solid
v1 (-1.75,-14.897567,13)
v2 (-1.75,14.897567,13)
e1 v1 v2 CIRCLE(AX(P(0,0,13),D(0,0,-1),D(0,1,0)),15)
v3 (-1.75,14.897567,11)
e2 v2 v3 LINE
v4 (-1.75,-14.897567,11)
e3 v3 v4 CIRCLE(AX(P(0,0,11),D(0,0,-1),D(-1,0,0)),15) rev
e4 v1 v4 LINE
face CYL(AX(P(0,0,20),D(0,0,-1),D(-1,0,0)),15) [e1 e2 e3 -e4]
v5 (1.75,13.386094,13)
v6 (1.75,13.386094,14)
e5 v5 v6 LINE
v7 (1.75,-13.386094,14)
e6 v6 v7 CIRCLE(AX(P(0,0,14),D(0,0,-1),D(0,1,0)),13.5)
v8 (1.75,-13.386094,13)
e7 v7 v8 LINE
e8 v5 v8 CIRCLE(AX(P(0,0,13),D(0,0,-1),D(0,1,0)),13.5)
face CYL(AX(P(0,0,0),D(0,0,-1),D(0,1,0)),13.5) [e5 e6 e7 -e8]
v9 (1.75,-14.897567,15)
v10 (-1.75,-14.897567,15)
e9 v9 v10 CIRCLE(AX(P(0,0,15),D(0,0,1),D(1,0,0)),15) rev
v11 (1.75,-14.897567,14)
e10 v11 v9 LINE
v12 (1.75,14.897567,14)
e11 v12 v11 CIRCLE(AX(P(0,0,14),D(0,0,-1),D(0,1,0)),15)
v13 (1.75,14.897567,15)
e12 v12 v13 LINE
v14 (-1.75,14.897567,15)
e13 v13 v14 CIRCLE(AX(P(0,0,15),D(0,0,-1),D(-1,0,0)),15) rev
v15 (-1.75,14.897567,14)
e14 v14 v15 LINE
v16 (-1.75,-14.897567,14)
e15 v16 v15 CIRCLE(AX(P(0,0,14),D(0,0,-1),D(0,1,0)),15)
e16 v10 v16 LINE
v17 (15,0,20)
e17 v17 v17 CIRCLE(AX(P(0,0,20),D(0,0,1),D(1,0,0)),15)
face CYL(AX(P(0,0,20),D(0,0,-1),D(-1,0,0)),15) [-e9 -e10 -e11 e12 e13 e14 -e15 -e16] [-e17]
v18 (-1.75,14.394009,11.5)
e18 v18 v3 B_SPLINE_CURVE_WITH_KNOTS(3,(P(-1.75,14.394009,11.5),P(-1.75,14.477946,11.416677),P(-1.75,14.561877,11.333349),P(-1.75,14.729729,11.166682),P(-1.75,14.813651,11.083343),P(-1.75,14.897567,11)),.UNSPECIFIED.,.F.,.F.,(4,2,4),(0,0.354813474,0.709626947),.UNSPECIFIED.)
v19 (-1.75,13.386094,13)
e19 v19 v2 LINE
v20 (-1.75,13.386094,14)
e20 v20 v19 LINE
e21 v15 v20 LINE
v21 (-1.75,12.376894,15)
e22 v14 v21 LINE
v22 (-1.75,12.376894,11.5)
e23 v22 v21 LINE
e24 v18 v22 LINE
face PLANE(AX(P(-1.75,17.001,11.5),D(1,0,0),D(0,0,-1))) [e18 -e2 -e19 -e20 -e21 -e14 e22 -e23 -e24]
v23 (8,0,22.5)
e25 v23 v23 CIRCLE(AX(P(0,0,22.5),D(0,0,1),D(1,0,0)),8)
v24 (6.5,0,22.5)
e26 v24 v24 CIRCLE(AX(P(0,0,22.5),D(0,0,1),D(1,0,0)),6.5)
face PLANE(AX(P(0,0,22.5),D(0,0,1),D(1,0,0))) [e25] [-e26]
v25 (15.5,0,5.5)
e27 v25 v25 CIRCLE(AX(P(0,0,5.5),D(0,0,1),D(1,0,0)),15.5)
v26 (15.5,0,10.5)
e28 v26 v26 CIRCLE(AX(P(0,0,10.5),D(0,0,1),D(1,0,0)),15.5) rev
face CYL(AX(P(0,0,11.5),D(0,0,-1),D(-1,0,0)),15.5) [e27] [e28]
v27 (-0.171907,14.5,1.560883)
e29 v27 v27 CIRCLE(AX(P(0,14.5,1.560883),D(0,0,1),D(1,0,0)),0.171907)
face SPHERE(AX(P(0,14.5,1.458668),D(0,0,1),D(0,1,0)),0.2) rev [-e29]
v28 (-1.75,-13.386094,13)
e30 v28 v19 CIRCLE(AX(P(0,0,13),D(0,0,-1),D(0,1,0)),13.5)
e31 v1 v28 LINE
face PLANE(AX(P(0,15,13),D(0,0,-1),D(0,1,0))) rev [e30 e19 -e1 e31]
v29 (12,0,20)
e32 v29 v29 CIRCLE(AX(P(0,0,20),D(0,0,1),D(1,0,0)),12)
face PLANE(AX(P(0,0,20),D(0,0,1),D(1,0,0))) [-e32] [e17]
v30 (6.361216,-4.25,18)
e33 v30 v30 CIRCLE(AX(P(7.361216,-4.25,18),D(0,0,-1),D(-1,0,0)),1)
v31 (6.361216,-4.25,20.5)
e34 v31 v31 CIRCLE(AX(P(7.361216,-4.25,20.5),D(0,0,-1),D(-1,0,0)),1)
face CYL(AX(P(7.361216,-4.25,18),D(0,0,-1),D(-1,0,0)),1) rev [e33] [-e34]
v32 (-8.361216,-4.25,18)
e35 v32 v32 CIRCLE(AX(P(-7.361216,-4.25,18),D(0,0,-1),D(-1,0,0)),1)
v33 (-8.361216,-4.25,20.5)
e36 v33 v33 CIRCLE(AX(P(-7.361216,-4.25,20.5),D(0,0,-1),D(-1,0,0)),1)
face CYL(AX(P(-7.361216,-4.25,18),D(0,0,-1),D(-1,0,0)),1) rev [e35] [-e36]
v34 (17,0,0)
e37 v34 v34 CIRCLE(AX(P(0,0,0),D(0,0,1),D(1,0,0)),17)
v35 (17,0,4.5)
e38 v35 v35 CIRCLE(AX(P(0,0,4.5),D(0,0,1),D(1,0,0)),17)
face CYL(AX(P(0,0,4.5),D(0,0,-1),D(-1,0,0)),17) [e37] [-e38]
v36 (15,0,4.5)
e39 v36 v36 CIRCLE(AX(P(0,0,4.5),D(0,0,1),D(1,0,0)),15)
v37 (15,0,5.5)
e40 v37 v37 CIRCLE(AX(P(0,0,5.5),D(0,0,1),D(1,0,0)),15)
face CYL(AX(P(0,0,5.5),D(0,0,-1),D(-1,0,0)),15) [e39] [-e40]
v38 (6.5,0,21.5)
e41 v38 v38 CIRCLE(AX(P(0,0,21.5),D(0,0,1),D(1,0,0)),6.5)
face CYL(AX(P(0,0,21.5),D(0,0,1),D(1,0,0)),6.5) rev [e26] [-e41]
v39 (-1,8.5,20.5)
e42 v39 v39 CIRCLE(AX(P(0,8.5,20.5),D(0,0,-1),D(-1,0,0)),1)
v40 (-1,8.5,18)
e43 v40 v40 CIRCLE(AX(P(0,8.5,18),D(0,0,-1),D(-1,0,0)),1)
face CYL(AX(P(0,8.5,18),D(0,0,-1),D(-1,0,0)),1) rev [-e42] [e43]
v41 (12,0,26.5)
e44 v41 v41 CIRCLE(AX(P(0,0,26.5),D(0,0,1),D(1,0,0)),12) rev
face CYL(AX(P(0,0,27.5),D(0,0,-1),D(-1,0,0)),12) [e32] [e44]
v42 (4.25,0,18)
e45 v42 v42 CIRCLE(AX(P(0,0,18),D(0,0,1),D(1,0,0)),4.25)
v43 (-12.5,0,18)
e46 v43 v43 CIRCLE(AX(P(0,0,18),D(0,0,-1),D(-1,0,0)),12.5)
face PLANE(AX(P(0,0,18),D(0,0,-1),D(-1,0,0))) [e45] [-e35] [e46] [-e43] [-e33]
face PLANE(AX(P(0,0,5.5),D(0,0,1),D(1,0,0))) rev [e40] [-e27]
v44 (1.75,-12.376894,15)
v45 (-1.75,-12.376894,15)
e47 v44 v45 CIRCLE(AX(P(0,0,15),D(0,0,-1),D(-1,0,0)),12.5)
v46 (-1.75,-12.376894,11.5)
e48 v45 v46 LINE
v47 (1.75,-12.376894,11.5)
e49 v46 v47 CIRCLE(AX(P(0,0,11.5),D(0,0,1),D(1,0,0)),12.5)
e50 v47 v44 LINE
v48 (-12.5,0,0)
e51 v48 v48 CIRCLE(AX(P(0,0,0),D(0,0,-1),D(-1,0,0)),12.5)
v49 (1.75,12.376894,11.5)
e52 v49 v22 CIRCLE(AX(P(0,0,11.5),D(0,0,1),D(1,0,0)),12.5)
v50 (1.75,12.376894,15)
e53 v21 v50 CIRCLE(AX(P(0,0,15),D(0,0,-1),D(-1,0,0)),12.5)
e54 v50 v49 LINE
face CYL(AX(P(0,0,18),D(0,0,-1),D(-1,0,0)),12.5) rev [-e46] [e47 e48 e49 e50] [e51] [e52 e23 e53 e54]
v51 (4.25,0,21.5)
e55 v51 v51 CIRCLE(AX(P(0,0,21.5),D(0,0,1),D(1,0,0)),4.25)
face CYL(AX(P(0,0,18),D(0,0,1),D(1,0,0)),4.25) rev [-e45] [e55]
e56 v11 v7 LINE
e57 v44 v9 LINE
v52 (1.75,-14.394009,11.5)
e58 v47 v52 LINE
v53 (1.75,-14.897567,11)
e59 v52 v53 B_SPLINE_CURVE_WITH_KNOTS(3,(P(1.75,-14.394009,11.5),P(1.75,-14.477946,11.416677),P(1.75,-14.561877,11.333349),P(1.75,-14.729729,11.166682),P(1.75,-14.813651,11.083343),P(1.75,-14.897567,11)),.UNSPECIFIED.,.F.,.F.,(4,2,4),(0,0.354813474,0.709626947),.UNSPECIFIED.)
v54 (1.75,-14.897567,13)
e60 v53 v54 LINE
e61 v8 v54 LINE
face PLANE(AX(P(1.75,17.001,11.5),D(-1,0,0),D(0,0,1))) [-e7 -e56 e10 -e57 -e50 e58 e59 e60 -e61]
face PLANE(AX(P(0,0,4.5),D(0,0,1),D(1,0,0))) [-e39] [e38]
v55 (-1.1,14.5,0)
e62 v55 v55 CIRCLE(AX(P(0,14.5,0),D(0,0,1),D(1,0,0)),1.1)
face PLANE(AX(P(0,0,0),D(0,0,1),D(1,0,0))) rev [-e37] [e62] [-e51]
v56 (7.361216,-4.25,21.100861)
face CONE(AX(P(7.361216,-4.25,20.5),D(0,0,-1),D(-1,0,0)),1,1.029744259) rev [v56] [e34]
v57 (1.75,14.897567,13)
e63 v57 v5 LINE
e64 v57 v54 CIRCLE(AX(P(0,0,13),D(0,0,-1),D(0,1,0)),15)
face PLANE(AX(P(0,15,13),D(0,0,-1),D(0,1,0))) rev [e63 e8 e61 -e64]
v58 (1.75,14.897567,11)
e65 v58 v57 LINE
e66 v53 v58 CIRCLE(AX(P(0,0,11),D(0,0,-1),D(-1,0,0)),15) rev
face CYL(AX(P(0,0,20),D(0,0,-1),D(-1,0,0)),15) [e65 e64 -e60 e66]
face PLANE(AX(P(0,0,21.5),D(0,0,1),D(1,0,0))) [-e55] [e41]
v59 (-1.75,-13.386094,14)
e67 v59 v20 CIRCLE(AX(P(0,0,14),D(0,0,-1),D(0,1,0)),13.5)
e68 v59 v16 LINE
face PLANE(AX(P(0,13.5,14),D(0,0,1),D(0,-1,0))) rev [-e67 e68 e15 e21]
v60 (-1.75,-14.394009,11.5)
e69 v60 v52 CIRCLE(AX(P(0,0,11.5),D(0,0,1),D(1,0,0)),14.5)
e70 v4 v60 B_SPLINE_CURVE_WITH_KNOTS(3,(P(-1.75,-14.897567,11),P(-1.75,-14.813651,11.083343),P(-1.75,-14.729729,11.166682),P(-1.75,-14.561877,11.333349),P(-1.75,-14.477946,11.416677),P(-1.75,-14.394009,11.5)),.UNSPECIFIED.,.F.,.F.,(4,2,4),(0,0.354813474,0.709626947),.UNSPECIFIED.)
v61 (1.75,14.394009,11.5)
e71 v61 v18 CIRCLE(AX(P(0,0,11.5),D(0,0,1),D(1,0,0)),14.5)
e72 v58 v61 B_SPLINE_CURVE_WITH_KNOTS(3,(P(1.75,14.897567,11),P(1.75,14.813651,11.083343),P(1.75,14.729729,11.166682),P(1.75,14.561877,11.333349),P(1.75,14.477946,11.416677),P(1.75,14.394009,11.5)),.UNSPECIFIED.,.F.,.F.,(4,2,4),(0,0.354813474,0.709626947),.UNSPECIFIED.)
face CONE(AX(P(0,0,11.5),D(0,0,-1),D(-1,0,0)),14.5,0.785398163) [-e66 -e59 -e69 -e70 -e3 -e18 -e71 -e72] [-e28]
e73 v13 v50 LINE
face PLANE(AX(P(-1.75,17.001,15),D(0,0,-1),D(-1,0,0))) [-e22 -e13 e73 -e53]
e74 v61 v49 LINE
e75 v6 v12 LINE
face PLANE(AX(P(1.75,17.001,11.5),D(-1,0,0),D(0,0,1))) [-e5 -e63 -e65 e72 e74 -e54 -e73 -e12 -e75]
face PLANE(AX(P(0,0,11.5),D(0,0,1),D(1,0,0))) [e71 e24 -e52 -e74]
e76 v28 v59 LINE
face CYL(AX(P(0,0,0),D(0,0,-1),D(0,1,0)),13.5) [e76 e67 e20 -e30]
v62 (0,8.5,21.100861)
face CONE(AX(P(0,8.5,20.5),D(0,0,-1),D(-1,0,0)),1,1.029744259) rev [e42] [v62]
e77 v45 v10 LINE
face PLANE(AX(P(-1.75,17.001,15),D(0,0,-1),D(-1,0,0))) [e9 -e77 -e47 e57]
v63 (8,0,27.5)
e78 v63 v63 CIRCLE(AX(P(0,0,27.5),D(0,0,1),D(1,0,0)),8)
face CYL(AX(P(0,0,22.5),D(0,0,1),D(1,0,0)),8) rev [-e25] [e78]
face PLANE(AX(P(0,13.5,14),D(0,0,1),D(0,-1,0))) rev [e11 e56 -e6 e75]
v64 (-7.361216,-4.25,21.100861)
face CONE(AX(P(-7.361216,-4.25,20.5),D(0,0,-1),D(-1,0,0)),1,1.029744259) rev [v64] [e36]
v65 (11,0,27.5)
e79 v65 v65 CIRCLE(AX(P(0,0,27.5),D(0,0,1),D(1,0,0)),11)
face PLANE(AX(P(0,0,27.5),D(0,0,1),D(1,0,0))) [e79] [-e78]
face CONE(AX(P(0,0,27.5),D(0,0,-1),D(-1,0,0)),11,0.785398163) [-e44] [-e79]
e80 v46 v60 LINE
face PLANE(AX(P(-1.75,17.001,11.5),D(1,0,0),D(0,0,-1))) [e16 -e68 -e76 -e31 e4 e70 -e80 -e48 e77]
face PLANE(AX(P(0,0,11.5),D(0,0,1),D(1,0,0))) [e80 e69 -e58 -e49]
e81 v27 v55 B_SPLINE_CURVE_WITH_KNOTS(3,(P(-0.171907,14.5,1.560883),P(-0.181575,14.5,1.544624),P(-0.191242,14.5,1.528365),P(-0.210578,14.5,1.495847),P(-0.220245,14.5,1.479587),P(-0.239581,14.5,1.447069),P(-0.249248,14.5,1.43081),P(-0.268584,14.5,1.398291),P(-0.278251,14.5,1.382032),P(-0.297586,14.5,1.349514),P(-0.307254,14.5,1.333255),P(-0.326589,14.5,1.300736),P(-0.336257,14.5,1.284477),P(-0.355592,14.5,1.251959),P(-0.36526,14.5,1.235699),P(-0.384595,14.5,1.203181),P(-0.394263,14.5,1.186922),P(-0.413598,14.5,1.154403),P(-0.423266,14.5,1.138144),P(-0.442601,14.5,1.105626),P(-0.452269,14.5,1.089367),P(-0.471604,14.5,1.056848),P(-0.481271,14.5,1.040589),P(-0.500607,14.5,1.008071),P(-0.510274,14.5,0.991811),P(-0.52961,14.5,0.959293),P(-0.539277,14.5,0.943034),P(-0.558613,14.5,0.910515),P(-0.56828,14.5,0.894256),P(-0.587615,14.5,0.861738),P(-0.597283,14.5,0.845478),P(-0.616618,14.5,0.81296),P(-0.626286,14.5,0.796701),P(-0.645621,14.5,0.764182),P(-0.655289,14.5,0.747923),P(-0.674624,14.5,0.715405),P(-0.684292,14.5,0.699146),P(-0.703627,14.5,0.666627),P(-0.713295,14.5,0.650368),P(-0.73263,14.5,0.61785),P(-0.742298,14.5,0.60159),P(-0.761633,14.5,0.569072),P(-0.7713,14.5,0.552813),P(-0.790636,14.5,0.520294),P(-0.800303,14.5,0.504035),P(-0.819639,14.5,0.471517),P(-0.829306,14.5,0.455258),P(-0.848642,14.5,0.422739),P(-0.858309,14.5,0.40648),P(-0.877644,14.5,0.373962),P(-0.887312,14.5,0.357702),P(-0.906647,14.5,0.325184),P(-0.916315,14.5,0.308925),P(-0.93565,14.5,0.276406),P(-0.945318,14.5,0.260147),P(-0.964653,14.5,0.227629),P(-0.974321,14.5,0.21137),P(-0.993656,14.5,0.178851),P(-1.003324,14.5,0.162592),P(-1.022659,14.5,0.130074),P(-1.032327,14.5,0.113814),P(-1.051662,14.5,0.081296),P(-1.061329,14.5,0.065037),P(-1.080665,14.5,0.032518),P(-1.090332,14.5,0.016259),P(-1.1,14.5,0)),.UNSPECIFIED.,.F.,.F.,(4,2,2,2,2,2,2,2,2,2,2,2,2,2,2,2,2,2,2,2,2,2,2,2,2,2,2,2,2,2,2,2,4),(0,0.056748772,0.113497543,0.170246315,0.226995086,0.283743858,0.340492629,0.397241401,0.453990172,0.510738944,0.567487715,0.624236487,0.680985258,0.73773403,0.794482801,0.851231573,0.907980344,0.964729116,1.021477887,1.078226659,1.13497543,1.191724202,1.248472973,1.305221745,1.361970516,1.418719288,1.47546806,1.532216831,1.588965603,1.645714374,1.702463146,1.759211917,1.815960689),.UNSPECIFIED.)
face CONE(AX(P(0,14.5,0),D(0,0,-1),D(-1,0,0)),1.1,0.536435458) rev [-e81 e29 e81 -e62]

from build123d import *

# Parameters (mm, degrees)
SKETCH1_R                           = 17
BOSS_EXTRUDE1_DEPTH                 = 4.5
SKETCH2_R                           = 15
BOSS_EXTRUDE2_DEPTH                 = 1
SKETCH3_R                           = 15.5
BOSS_EXTRUDE3_DEPTH                 = 6
SKETCH7_R                           = 15
BOSS_EXTRUDE4_DEPTH                 = 8.5
SKETCH8_R                           = 12
BOSS_EXTRUDE5_DEPTH                 = 7.5
CUT_EXTRUDE1_REACH                  = 38.527
CUT_EXTRUDE1_END_RADIUS             = 15
SKETCH9_W                           = 3.5
SKETCH9_H                           = 3.5
CUT_EXTRUDE1_DIRECTION_2_REACH      = 38.527
CUT_EXTRUDE1_DIRECTION_2_END_RADIUS = 15
CHAMFER1_SIZE                       = 1
CHAMFER2_SIZE                       = 1
SKETCH10_R                          = 12.5
CUT_EXTRUDE2_DEPTH                  = 18
SKETCH11_R                          = 8
CUT_EXTRUDE3_DEPTH                  = 5
SKETCH12_R                          = 6.5
CUT_EXTRUDE4_DEPTH                  = 1
SKETCH13_R                          = 4.25
CUT_EXTRUDE5_DEPTH                  = 3.5
SKETCH17_W                          = 1
SKETCH17_H                          = 1.5
F_2_0_2_DIAMETER_HOLE1_D            = 2
F_2_0_2_DIAMETER_HOLE1_DEPTH        = 2.5
F_2_0_2_DIAMETER_HOLE1_TIP          = 0.600860619


with BuildPart() as part:
    # Sketch1 → Boss-Extrude1 (new body)
    with BuildSketch(Plane.XY):
        Circle(SKETCH1_R)
    extrude(amount=BOSS_EXTRUDE1_DEPTH)

    # Sketch2 → Boss-Extrude2 (add)
    with BuildSketch(Plane.XY.offset(4.5)):
        Circle(SKETCH2_R)
    extrude(amount=BOSS_EXTRUDE2_DEPTH)

    # Sketch3 → Boss-Extrude3 (add)
    with BuildSketch(Plane.XY.offset(5.5)):
        Circle(SKETCH3_R)
    extrude(amount=BOSS_EXTRUDE3_DEPTH)

    # Sketch7 → Boss-Extrude4 (add)
    with BuildSketch(Plane.XY.offset(11.5)):
        Circle(SKETCH7_R)
    extrude(amount=BOSS_EXTRUDE4_DEPTH)

    # Sketch8 → Boss-Extrude5 (add)
    with BuildSketch(Plane.XY.offset(20)):
        Circle(SKETCH8_R)
    extrude(amount=BOSS_EXTRUDE5_DEPTH)

    # Cut-Extrude1: up to this cylinder (the profile starts inside it)
    cut_extrude1_end = Plane(origin=(0, 0, 13.25), z_dir=(0, 0, -1)) * Cylinder(CUT_EXTRUDE1_END_RADIUS, 108.054, mode=Mode.PRIVATE)
    # Sketch9 → Cut-Extrude1 (cut, up to the surface)
    with BuildSketch(Plane(origin=(0, 0, 0), x_dir=(1, 0, 0), z_dir=(0, 1, 0)), mode=Mode.PRIVATE) as cut_extrude1_sk1:
        with Locations((0, -13.25)):
            Rectangle(SKETCH9_W, SKETCH9_H)
    cut_extrude1_tool1 = extrude(cut_extrude1_sk1.sketch, amount=-CUT_EXTRUDE1_REACH, mode=Mode.PRIVATE) & cut_extrude1_end
    add(cut_extrude1_tool1.solids().sort_by_distance((0, 0, 13.25))[0], mode=Mode.SUBTRACT)

    # Cut-Extrude1 direction 2: up to this cylinder (the profile starts inside it)
    cut_extrude1_direction_2_end = Plane(origin=(0, 0, 13.25), z_dir=(0, 0, -1)) * Cylinder(CUT_EXTRUDE1_DIRECTION_2_END_RADIUS, 108.054, mode=Mode.PRIVATE)
    # Sketch9 → Cut-Extrude1 direction 2 (cut, up to the surface)
    with BuildSketch(Plane(origin=(0, 0, 0), x_dir=(1, 0, 0), z_dir=(0, 1, 0)), mode=Mode.PRIVATE) as cut_extrude1_direction_2_sk1:
        with Locations((0, -13.25)):
            Rectangle(SKETCH9_W, SKETCH9_H)
    cut_extrude1_direction_2_tool1 = extrude(cut_extrude1_direction_2_sk1.sketch, amount=CUT_EXTRUDE1_DIRECTION_2_REACH, mode=Mode.PRIVATE) & cut_extrude1_direction_2_end
    add(cut_extrude1_direction_2_tool1.solids().sort_by_distance((0, 0, 13.25))[0], mode=Mode.SUBTRACT)

    # Chamfer1
    # the kernel refuses this chamfer: 1 mm, written as the material it takes off along each edge
    with BuildSketch(Plane(origin=(0, 0, 11.5), x_dir=(1, 0, 0), z_dir=(0, -1, 0))) as chamfer1_piece_1_section:
        Polygon((15.5, -CHAMFER1_SIZE), (15.5 - CHAMFER1_SIZE, 0), (15.5, 0), align=None)
    chamfer1_piece_1 = revolve(axis=Axis((0, 0, 11.5), (0, 0, 1)), mode=Mode.PRIVATE)
    chamfer1_piece_1 = chamfer1_piece_1 - Plane(origin=(0, 0, 10.7680681), x_dir=(1, 0, 0), z_dir=(0, 0, -1)) * Cylinder(15, 62, mode=Mode.PRIVATE)
    add(chamfer1_piece_1, mode=Mode.SUBTRACT)
    with BuildSketch(Plane(origin=(0, 0, 11.5), x_dir=(1, 0, 0), z_dir=(0, -1, 0))) as chamfer1_piece_2_section:
        Polygon((15.5, -CHAMFER1_SIZE), (15.5 - CHAMFER1_SIZE, 0), (15.5, 0), align=None)
    chamfer1_piece_2 = revolve(axis=Axis((0, 0, 11.5), (0, 0, 1)), mode=Mode.PRIVATE)
    chamfer1_piece_2 = split(chamfer1_piece_2, bisect_by=Plane(origin=(-1.75, 14.798779875, 11.333335543), z_dir=(1, 0, 0)), keep=Keep.TOP, mode=Mode.PRIVATE)
    chamfer1_piece_2 = split(chamfer1_piece_2, bisect_by=Plane(origin=(1.75, 14.798779875, 11.333335543), z_dir=(-1, 0, 0)), keep=Keep.TOP, mode=Mode.PRIVATE)
    add(chamfer1_piece_2, mode=Mode.SUBTRACT)

    # Chamfer2
    chamfer2_edges = [part.edges().sort_by_distance(p)[0] for p in [
        (-12, 0, 27.5),
    ]]
    chamfer(chamfer2_edges, length=CHAMFER2_SIZE)

    # Sketch10 → Cut-Extrude2 (cut)
    with BuildSketch(Plane(origin=(0, 0, 0), x_dir=(-1, 0, 0), z_dir=(0, 0, -1))):
        Circle(SKETCH10_R)
    extrude(amount=-CUT_EXTRUDE2_DEPTH, mode=Mode.SUBTRACT)

    # Sketch11 → Cut-Extrude3 (cut)
    with BuildSketch(Plane.XY.offset(27.5)):
        Circle(SKETCH11_R)
    extrude(amount=-CUT_EXTRUDE3_DEPTH, mode=Mode.SUBTRACT)

    # Sketch12 → Cut-Extrude4 (cut)
    with BuildSketch(Plane.XY.offset(22.5)):
        Circle(SKETCH12_R)
    extrude(amount=-CUT_EXTRUDE4_DEPTH, mode=Mode.SUBTRACT)

    # Sketch13 → Cut-Extrude5 (cut)
    with BuildSketch(Plane.XY.offset(21.5)):
        Circle(SKETCH13_R)
    extrude(amount=-CUT_EXTRUDE5_DEPTH, mode=Mode.SUBTRACT)

    # Sketch6 → Cut-Revolve4 (revolve, cut)
    with BuildSketch(Plane(origin=(0, 0, 0), x_dir=(0, 0, -1), z_dir=(1, 0, 0))):
        with BuildLine():
            Line((0, 14.5), (0, 15.6))
            Line((0, 15.6), (-1.560883383, 14.671907178))
            ThreePointArc((-1.560883383, 14.671907178), (-1.632511647, 14.598886259), (-1.658668305, 14.5))
            Line((-1.658668305, 14.5), (0, 14.5))
        make_face()
    revolve(axis=Axis((0, 14.5, 1.658668305), (0, 0, -1)), mode=Mode.SUBTRACT)

    # Sketch17 → Cut-Revolve5 (revolve, cut)
    with BuildSketch(Plane(origin=(0, 0, 0), x_dir=(0, 0, -1), z_dir=(1, 0, 0)), mode=Mode.PRIVATE) as cut_revolve5_sk:
        with Locations((-13.5, 14.25)):
            Rectangle(SKETCH17_W, SKETCH17_H)
    revolve(cut_revolve5_sk.sketch.rotate(Axis((0, 0, 0), (0, 0, 1)), 6.699765178), axis=Axis((0, 0, 0), (0, 0, 1)), mode=Mode.SUBTRACT)

    # Ø2.0 (2) Diameter Hole1
    with Locations(Plane(origin=(0, 0, 18), x_dir=(-1, 0, 0), z_dir=(0, 0, -1))):
        with Locations((0, 8.5), (7.361215932, -4.25), (-7.361215932, -4.25)):
            Hole(F_2_0_2_DIAMETER_HOLE1_D / 2, depth=F_2_0_2_DIAMETER_HOLE1_DEPTH)
            with Locations((0, 0, -(F_2_0_2_DIAMETER_HOLE1_DEPTH + F_2_0_2_DIAMETER_HOLE1_TIP / 2))):  # 118° drill point
                Cone(0, F_2_0_2_DIAMETER_HOLE1_D / 2, F_2_0_2_DIAMETER_HOLE1_TIP, mode=Mode.SUBTRACT)


solid = part.part
